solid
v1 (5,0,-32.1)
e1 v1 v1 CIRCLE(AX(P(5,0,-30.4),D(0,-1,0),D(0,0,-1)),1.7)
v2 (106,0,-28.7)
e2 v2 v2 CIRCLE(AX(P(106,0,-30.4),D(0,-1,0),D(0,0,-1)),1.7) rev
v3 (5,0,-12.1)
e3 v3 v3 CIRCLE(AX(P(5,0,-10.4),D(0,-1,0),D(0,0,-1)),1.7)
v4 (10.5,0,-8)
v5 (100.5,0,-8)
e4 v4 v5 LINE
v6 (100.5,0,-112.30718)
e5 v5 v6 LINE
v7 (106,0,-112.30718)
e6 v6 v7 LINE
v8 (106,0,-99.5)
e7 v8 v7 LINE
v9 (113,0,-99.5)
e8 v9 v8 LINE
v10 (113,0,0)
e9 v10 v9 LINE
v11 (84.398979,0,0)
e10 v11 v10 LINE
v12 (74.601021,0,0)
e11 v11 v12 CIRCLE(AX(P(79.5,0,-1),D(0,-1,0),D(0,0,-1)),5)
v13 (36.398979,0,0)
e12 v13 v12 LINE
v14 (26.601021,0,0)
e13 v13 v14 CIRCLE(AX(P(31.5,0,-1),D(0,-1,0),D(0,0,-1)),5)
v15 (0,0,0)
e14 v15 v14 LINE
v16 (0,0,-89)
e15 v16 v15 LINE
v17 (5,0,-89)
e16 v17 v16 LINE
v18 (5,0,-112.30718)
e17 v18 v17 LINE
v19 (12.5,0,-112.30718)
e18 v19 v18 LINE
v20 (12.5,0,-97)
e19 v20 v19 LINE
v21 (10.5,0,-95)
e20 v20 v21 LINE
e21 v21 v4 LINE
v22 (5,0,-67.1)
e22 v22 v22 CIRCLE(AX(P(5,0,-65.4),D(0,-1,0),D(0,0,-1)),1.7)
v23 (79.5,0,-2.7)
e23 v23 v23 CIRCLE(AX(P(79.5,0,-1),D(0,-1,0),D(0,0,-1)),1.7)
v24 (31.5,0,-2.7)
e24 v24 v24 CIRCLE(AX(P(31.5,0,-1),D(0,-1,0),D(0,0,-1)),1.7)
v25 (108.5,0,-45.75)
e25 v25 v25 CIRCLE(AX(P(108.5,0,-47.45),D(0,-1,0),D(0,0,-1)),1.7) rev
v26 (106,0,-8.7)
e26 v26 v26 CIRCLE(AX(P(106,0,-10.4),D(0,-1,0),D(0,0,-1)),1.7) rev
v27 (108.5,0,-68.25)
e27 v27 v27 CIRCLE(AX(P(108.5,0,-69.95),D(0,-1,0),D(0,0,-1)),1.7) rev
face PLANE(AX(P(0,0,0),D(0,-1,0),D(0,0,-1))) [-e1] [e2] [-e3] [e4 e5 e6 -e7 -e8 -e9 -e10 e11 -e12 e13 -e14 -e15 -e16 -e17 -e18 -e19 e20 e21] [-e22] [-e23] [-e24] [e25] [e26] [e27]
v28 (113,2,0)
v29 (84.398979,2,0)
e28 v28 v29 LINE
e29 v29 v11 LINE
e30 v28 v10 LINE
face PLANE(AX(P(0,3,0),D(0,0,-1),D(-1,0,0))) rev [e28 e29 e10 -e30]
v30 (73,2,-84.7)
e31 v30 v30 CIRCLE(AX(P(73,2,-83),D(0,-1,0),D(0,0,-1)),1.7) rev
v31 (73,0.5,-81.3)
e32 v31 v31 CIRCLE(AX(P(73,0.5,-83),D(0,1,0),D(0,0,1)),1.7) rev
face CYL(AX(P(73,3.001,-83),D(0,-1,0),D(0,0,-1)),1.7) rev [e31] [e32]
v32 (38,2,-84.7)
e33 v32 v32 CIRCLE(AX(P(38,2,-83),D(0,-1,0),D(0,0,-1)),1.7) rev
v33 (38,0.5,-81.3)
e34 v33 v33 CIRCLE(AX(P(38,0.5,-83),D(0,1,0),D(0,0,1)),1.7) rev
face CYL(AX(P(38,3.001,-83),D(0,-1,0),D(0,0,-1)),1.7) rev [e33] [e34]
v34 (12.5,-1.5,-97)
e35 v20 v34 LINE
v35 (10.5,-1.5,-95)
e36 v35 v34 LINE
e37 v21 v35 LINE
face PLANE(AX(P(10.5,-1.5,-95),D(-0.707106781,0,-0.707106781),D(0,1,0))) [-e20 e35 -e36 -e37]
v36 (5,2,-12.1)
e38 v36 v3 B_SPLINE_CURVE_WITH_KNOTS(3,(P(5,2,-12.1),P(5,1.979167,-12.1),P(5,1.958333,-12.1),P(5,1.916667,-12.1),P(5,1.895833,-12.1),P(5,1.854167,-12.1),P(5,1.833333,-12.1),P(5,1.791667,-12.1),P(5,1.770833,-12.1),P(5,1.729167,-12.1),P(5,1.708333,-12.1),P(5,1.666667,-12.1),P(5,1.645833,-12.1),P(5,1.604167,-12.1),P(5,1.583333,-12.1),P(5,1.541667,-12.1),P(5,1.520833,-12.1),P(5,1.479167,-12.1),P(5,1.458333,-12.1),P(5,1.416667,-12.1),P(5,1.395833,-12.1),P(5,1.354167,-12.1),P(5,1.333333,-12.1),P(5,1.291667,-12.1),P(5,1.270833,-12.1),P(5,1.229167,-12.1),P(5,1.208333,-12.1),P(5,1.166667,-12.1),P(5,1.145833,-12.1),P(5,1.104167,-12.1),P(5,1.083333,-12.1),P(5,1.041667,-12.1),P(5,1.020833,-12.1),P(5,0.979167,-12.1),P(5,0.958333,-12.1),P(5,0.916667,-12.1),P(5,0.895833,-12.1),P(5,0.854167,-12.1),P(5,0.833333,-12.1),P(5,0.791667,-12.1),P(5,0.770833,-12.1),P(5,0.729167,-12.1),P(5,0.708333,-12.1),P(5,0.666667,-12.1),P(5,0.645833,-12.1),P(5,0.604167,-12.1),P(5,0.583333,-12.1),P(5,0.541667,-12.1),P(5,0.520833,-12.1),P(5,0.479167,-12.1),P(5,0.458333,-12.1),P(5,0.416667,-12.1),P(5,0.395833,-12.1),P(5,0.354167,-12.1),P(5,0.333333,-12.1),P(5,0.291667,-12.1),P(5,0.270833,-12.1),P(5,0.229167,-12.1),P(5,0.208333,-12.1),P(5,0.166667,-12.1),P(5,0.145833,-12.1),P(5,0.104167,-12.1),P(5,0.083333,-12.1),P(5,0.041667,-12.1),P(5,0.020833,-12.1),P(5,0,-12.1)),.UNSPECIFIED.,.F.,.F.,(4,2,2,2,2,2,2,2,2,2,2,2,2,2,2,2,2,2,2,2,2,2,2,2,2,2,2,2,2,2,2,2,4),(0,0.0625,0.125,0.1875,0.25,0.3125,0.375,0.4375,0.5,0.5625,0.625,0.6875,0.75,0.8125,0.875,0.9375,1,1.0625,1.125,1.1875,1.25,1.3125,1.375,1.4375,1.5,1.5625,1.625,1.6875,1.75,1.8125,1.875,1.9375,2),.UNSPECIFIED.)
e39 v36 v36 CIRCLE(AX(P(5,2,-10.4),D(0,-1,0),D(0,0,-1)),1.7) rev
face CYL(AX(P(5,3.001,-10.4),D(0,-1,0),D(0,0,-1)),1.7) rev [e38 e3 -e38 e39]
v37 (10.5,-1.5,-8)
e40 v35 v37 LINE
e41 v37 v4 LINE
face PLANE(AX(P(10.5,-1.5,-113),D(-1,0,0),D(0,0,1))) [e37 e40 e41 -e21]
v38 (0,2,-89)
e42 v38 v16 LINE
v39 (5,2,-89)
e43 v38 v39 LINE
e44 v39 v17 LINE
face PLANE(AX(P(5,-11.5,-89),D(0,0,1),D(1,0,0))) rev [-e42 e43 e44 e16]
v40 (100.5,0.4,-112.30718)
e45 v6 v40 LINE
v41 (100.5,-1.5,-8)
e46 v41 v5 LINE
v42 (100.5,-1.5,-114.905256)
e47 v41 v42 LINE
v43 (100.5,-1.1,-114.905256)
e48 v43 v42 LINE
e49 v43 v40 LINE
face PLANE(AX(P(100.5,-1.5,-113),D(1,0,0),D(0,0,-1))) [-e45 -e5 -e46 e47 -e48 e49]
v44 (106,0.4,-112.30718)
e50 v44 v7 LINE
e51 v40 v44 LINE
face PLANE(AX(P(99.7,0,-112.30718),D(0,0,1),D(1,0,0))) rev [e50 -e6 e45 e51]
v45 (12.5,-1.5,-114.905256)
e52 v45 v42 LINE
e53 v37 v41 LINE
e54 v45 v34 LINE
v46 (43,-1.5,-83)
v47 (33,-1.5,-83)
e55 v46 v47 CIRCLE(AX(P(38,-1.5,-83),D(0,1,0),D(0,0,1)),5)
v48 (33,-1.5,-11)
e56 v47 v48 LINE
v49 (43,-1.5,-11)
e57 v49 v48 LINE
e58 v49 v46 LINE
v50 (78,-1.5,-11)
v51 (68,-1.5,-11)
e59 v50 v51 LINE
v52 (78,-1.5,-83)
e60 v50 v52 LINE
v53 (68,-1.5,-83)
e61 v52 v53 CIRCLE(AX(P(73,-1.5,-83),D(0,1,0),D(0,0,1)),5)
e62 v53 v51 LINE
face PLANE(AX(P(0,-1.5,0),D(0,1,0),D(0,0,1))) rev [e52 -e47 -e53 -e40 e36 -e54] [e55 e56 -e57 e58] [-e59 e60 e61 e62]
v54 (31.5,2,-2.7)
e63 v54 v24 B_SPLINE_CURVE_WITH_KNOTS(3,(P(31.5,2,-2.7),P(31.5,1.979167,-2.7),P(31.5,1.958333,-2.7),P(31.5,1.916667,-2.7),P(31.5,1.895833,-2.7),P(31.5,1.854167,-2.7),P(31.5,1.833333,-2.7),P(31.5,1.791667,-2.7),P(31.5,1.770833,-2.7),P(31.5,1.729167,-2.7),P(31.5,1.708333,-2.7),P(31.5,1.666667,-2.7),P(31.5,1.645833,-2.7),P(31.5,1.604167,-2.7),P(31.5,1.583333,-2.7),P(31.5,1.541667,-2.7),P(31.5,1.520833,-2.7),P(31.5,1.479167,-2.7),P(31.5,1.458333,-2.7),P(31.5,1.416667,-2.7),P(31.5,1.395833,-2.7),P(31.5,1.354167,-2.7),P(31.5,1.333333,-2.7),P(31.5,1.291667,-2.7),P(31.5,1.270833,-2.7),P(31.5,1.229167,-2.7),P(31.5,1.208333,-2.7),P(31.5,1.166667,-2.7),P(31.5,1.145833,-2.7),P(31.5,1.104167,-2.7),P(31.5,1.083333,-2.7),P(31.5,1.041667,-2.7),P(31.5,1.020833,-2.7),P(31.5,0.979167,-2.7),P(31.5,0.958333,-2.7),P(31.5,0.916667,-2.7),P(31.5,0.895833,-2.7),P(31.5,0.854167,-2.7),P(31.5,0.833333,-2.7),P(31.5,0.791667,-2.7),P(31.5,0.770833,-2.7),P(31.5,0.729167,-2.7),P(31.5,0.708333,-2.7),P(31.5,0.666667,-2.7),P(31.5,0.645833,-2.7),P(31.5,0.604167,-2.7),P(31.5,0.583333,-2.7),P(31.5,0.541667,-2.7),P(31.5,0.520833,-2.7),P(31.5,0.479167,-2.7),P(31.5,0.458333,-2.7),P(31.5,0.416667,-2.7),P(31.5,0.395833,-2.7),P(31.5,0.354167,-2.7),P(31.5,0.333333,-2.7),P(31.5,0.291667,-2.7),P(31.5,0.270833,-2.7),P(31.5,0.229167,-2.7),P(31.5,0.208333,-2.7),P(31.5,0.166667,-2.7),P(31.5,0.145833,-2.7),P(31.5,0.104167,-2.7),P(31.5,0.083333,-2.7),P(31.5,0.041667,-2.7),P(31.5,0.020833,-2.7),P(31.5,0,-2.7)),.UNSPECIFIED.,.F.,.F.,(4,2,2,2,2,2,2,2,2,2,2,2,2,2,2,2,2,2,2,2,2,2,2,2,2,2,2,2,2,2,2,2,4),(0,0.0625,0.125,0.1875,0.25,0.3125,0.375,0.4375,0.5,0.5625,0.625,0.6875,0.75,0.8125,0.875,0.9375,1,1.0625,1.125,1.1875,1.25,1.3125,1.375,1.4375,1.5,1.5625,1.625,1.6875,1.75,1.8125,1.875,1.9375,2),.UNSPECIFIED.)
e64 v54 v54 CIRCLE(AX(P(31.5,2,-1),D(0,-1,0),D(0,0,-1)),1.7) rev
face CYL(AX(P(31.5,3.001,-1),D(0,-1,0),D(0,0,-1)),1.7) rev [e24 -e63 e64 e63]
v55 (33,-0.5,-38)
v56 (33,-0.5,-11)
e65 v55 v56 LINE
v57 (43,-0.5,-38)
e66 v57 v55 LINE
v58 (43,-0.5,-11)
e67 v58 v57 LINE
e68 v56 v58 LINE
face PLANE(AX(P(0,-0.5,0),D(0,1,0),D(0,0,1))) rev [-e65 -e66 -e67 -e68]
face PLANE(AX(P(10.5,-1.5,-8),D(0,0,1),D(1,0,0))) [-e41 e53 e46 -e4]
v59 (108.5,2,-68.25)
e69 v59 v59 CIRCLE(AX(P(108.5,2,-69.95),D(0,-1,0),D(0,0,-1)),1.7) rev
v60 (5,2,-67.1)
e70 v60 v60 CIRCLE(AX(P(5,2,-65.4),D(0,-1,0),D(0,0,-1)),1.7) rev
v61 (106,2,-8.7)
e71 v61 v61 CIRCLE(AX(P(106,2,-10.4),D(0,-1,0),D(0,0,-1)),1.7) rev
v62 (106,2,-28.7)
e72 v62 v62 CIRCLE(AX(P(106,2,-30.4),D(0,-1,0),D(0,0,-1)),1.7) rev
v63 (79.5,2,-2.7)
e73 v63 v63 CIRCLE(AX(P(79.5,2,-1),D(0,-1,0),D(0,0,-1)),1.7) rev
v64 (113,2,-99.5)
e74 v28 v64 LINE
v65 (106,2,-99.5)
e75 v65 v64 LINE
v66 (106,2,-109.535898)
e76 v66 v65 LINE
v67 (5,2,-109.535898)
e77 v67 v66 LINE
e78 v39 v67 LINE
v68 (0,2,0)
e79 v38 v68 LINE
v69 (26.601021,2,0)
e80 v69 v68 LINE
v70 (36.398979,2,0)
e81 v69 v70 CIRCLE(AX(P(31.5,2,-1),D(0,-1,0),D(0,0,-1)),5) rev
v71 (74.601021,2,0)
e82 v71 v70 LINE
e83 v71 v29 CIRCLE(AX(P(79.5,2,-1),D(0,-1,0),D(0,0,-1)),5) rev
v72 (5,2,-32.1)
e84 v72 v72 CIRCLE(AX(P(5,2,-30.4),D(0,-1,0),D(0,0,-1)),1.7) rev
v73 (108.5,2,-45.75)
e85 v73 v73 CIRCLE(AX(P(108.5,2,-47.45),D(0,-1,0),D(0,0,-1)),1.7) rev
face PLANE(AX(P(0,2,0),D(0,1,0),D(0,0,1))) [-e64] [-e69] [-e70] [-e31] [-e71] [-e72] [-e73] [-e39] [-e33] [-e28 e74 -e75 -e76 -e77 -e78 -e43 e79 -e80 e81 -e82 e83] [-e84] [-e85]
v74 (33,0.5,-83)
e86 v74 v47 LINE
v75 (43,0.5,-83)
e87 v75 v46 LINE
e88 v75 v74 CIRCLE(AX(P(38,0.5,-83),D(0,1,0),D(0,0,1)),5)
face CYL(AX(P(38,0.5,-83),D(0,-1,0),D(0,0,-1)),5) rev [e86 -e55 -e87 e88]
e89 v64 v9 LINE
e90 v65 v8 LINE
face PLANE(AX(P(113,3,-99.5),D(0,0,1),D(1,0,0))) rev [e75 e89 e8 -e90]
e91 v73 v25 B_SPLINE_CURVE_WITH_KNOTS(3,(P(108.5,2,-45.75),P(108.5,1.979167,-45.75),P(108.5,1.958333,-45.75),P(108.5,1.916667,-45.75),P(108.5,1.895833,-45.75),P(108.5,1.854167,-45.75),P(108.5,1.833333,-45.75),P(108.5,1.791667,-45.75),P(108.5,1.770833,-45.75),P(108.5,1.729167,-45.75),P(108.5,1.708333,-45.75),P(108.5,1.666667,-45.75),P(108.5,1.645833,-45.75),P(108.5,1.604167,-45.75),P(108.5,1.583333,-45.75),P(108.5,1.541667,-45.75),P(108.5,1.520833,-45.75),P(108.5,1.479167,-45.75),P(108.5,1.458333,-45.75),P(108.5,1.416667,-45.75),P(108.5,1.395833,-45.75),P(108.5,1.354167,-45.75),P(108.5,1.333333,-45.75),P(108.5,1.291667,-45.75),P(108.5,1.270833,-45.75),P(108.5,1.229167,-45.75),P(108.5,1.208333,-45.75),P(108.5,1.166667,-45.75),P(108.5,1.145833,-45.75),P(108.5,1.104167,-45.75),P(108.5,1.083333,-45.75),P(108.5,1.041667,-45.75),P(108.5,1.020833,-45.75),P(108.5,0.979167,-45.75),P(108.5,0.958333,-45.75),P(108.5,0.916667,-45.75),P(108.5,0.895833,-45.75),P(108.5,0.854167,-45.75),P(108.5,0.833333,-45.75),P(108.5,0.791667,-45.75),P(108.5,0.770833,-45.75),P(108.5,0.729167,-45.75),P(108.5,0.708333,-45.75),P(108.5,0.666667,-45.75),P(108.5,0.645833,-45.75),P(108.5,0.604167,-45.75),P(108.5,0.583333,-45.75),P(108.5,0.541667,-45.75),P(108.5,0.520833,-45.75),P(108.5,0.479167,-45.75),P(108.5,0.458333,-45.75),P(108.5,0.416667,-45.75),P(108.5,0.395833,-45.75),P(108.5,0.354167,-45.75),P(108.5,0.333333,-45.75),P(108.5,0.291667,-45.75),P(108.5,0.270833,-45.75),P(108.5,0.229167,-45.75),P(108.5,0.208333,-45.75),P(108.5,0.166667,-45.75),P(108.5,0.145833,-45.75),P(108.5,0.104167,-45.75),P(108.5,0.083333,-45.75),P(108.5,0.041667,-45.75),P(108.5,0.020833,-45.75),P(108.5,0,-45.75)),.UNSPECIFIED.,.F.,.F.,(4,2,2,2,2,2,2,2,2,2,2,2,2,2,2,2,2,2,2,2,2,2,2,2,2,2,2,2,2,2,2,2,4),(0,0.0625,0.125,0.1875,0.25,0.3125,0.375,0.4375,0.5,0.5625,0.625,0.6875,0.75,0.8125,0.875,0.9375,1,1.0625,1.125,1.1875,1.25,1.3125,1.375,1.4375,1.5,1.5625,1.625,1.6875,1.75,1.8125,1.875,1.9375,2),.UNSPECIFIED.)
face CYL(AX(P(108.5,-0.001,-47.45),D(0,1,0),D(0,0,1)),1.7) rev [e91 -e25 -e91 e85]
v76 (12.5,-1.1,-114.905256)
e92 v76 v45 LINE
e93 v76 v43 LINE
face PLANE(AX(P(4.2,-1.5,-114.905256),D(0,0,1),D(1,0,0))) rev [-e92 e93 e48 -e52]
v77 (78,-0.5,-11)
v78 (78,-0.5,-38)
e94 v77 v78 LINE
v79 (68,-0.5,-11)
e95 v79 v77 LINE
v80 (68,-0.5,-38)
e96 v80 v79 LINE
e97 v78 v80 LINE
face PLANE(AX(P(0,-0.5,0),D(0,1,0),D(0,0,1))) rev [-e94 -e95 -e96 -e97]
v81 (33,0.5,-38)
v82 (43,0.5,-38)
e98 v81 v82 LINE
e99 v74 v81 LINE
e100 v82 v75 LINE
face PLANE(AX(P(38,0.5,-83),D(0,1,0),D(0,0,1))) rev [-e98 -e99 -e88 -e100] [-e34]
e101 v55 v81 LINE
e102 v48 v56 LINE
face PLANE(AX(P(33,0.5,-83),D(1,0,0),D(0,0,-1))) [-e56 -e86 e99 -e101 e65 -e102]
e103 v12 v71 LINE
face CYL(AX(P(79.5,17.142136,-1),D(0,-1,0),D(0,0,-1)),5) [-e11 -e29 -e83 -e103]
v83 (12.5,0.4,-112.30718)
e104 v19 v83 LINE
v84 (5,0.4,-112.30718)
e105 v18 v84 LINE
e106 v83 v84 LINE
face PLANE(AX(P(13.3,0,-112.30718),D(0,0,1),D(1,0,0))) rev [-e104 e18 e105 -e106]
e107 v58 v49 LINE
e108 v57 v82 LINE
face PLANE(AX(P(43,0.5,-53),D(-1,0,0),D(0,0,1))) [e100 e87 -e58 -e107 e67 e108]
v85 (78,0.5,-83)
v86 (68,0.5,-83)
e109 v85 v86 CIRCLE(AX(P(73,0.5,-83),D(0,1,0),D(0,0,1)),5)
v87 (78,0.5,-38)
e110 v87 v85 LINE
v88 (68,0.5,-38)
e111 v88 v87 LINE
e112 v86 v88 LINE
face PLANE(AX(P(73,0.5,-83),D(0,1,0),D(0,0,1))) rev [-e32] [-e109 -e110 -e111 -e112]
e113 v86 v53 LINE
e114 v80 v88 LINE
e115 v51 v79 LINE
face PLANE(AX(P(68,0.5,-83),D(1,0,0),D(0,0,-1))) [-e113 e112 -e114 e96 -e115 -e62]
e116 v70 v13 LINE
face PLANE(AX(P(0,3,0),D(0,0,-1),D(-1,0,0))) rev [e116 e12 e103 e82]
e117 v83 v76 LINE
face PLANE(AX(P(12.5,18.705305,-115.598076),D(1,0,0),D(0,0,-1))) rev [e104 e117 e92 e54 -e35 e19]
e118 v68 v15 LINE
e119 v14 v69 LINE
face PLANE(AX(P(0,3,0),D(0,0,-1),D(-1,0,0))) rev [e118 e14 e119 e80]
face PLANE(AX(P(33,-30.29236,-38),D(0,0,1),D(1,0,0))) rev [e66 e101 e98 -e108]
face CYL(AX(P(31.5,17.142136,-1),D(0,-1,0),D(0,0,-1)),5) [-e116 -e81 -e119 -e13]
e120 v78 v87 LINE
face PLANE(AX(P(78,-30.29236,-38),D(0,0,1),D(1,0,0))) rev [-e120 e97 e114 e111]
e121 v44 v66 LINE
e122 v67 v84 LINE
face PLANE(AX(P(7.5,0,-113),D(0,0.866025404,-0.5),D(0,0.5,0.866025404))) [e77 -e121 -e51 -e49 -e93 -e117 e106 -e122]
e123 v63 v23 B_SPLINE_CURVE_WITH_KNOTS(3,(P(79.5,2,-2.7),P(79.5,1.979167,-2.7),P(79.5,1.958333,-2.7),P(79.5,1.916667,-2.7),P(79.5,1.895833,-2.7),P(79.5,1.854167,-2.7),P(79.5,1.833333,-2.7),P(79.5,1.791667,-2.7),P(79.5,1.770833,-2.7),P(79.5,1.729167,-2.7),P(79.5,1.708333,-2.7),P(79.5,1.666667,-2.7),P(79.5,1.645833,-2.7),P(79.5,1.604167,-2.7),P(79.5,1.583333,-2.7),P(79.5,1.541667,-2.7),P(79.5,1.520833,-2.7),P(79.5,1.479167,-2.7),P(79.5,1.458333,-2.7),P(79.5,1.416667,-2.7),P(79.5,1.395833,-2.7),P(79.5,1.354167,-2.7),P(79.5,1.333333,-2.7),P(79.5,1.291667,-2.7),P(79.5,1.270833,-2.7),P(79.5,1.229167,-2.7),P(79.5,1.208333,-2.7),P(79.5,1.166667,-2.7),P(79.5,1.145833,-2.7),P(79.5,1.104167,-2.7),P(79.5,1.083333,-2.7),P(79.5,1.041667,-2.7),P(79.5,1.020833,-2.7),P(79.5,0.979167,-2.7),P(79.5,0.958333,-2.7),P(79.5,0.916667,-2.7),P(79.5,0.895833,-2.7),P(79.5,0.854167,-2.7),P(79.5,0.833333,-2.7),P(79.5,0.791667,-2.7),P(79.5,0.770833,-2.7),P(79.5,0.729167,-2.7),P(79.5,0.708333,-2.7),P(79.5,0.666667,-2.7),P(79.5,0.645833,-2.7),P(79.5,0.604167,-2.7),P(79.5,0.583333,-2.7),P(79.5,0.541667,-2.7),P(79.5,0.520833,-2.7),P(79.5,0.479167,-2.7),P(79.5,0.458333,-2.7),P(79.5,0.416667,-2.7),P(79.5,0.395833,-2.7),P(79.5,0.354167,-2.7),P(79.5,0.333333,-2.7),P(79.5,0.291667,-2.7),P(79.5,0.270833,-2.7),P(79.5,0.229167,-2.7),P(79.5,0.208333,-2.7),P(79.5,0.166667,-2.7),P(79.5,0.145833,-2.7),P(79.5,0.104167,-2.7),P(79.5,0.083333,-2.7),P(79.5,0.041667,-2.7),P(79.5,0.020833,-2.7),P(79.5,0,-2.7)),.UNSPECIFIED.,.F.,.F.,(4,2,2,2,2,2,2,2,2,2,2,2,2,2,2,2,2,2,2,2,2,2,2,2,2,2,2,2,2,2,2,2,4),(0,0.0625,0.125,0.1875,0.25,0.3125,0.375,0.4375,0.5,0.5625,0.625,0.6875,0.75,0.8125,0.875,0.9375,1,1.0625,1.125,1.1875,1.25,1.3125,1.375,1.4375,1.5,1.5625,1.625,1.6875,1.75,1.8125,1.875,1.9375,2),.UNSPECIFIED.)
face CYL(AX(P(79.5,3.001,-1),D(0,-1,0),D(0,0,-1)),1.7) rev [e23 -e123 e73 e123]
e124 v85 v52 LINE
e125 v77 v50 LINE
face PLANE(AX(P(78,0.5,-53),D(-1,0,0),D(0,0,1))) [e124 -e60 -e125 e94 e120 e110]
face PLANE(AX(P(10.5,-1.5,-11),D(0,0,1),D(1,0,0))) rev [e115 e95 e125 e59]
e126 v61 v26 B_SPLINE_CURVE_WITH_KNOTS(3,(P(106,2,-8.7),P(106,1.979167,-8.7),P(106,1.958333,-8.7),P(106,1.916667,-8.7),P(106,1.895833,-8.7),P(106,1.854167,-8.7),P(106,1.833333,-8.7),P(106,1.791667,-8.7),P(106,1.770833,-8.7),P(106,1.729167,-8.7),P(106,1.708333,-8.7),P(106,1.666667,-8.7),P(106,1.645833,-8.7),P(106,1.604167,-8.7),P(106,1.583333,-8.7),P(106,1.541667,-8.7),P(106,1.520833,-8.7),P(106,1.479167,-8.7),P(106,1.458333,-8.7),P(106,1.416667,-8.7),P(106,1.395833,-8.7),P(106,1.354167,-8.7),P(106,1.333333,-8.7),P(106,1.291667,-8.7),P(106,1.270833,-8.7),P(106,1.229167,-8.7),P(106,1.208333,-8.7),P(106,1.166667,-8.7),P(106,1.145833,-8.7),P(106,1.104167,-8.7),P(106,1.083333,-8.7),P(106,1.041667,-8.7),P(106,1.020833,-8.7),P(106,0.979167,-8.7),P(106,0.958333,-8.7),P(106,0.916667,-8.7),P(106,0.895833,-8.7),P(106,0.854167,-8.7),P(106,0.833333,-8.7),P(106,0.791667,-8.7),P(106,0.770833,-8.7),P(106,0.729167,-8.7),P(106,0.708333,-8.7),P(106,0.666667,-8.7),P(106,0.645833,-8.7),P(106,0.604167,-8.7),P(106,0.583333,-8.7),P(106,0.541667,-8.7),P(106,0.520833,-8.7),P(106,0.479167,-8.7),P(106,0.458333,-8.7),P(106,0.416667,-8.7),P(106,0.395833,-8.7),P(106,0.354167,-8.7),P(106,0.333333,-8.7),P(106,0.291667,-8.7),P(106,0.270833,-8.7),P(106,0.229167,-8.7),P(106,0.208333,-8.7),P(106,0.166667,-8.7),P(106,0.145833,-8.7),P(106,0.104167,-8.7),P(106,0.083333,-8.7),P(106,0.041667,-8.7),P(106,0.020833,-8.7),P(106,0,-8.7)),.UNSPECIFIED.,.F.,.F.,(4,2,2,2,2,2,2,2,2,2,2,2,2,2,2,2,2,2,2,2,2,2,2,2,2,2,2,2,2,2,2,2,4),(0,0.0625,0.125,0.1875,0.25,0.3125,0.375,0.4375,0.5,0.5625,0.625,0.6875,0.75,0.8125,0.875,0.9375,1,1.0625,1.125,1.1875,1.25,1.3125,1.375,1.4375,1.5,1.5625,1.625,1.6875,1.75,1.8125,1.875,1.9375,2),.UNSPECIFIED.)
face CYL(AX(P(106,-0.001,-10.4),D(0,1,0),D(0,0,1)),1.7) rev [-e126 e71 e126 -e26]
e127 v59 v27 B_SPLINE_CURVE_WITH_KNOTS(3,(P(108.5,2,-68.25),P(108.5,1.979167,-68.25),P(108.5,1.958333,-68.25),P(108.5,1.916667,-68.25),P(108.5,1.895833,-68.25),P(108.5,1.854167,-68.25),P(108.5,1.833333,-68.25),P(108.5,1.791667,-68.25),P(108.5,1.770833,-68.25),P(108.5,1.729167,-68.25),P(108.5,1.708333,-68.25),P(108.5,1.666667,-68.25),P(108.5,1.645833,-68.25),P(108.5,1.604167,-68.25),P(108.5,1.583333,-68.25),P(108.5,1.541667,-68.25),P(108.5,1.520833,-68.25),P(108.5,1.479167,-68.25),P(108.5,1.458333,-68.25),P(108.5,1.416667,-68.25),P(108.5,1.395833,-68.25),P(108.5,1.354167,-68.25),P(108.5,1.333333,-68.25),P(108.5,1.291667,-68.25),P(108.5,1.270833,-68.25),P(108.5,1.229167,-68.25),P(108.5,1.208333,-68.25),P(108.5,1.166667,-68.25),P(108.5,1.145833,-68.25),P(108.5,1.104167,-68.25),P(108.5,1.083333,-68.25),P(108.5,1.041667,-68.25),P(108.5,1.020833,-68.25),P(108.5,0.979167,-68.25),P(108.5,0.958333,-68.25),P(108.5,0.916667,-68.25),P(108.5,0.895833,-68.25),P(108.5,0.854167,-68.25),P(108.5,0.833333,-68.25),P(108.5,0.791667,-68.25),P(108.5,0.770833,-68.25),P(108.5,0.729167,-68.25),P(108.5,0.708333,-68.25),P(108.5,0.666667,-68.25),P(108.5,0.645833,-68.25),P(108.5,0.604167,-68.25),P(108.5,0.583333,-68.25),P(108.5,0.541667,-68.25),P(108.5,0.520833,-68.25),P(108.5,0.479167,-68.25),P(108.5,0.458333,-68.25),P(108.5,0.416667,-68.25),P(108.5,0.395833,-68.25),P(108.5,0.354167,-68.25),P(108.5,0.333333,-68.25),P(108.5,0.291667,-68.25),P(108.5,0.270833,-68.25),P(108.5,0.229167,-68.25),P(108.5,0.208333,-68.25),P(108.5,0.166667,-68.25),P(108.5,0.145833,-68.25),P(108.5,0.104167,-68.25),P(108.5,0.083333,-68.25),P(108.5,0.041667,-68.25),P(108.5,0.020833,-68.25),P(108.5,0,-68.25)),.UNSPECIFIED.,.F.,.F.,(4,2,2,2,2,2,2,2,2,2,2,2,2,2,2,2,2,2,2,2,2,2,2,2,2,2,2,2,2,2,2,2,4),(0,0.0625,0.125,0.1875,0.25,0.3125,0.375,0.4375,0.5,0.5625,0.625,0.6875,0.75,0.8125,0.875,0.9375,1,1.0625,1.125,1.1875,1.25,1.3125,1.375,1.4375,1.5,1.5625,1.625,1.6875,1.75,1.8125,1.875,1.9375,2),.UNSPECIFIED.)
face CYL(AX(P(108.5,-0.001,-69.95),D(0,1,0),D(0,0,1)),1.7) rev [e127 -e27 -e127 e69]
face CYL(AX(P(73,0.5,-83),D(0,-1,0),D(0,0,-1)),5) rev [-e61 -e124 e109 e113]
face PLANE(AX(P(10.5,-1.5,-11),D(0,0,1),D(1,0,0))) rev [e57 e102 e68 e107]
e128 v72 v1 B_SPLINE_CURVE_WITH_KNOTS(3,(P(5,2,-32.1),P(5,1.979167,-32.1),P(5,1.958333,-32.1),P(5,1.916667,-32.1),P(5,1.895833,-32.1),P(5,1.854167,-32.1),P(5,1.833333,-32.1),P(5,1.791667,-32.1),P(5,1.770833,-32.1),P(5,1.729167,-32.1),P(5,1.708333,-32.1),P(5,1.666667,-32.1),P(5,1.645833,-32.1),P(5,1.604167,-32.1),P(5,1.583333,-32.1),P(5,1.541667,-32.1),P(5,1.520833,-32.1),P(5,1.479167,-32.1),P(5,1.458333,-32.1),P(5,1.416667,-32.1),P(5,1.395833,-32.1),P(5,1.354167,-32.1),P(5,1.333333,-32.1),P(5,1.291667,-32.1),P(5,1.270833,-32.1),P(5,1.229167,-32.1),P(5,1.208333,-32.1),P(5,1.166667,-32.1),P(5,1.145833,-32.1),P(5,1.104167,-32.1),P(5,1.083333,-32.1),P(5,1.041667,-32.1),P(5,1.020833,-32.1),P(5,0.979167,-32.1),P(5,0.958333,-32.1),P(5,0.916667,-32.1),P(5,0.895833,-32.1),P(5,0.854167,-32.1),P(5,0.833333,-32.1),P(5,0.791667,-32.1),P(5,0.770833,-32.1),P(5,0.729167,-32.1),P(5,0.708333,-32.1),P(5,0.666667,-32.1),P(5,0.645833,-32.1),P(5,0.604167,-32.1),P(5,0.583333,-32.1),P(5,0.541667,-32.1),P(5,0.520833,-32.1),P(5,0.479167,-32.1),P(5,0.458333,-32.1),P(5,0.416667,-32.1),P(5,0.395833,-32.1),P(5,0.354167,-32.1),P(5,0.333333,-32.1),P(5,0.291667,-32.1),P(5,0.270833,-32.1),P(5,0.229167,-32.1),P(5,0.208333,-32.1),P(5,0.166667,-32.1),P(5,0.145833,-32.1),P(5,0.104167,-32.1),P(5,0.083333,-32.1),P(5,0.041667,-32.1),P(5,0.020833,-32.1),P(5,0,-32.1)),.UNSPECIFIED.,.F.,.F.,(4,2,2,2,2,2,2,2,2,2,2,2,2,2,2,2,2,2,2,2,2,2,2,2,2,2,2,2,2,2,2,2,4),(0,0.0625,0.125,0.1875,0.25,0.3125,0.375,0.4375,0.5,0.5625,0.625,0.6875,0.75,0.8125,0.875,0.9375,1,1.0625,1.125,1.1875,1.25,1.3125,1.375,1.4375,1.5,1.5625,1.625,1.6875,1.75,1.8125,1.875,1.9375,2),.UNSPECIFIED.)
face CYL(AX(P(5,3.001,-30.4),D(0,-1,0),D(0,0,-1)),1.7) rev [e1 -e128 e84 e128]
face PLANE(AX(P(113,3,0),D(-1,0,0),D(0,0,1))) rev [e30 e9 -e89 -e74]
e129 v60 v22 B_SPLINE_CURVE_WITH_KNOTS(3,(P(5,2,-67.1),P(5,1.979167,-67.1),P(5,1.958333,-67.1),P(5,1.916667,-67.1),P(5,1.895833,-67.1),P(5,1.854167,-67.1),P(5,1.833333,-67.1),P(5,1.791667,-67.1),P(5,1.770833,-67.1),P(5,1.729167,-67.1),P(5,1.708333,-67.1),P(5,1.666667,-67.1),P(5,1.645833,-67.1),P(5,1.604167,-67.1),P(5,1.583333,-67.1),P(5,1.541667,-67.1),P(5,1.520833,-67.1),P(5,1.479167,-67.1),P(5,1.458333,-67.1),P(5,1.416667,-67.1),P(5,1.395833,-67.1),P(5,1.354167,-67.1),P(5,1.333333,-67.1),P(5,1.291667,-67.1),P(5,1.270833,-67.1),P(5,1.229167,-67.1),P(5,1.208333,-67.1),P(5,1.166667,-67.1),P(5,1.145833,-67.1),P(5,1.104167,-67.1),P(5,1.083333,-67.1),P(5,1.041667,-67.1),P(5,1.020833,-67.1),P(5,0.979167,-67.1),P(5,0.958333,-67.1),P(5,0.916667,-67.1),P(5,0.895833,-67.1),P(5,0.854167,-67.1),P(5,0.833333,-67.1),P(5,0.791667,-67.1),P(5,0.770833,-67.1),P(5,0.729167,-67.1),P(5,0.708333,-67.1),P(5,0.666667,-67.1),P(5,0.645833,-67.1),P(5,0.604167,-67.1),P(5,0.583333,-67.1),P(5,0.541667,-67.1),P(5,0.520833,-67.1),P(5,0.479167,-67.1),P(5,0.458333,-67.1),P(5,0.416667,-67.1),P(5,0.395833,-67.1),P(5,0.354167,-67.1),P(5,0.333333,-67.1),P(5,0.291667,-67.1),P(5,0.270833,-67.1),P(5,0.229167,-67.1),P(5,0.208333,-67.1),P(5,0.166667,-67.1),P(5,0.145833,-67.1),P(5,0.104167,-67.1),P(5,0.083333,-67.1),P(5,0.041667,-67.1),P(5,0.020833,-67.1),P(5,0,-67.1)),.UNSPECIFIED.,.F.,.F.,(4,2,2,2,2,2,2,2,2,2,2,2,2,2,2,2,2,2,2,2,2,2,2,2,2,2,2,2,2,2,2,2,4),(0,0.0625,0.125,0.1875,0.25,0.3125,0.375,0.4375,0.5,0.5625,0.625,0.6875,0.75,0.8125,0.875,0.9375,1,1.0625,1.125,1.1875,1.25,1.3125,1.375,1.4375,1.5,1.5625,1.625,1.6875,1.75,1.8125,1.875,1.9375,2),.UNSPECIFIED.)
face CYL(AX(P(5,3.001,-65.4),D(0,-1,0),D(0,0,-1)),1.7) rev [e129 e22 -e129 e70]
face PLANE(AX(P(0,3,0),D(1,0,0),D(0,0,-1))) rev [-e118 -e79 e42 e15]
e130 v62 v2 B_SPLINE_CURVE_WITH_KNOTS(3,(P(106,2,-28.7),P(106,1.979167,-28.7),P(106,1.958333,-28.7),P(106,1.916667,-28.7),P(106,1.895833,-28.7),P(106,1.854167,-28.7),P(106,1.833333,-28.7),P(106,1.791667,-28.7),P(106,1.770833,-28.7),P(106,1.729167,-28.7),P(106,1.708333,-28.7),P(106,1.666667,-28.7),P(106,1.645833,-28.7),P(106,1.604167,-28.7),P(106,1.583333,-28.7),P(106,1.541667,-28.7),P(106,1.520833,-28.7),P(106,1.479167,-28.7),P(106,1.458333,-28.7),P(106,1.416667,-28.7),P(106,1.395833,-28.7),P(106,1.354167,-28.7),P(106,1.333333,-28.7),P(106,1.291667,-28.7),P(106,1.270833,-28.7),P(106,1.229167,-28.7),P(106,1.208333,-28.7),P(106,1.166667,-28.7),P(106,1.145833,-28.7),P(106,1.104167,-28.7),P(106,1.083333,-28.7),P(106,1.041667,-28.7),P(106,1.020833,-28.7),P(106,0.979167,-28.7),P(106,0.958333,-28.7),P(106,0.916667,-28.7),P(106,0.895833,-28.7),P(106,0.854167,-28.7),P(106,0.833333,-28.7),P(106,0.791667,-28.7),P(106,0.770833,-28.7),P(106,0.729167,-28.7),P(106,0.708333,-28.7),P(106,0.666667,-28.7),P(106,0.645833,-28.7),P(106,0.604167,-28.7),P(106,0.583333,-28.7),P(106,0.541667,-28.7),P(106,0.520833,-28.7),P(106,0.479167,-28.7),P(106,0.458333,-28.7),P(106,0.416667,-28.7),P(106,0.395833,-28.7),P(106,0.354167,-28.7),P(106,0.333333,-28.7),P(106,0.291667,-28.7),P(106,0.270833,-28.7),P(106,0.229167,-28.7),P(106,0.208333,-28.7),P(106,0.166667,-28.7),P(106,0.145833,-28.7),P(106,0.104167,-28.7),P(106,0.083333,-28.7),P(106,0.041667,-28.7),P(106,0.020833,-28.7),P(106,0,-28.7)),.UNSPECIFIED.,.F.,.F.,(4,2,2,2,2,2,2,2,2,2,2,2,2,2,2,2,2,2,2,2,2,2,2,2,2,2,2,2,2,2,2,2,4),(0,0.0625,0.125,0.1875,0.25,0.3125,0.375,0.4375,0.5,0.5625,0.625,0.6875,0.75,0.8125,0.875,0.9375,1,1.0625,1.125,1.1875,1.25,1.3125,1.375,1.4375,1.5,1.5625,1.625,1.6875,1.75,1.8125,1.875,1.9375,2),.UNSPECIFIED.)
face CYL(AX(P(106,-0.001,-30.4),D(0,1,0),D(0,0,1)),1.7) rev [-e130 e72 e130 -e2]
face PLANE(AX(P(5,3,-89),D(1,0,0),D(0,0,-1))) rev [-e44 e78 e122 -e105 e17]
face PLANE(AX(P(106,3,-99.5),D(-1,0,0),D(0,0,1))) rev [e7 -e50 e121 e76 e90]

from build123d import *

# Parameters (mm, degrees)
SKETCH_1_W           = 113
SKETCH_1_H           = 113
EXTRUDE_1_DEPTH      = 3
CUT_EXTRUDE_1_REACH  = 161.834
SKETCH_2_R           = 1.7
SKETCH_3_W           = 90
SKETCH_3_H           = 105
EXTRUDE_2_DEPTH      = 1.5
SKETCH_5_R           = 5
EXTRUDE_3_DEPTH      = 3
CUT_EXTRUDE_2_REACH  = 161.834
SKETCH_6_R           = 1.7
CUT_EXTRUDE_3_REACH  = 161.834
SKETCH_7_R           = 1.7
CUT_EXTRUDE_4_REACH  = 161.869
SKETCH_8_R           = 1.7
EXTRUDE_5_DEPTH      = 90
CUT_EXTRUDE_5_DEPTH  = 2
SKETCH_13_W          = 2
SKETCH_13_H          = 12
EXTRUDE_6_DEPTH      = 11.5
CUT_EXTRUDE_6_REACH  = 161.985
SKETCH_14_R          = 1.7
CUT_EXTRUDE_7_REACH  = 164.062
EXTRUDE_7_DEPTH      = 8.5
SKETCH_17_W          = 2
SKETCH_17_H          = 11.5
EXTRUDE_8_DEPTH      = 3
FILLET_1_R           = 1
CUT_EXTRUDE_8_DEPTH  = 163.062226394
SKETCH_20_W          = 113
SKETCH_20_H          = 12.124355653
CUT_EXTRUDE_9_DEPTH  = 1
CHAMFER_1_SIZE       = 1
SKETCH_21_W          = 7
SKETCH_21_H          = 13.5
CUT_EXTRUDE_10_DEPTH = 163.062226394
SKETCH_22_W          = 5
SKETCH_22_H          = 24
CUT_EXTRUDE_11_DEPTH = 163.062226394
SKETCH_23_W          = 2
SKETCH_23_H          = 18.598076211
CUT_EXTRUDE_12_DEPTH = 1.5
CHAMFER_2_SIZE       = 2
SKETCH_24_W          = 0.692820323
SKETCH_24_H          = 0.4
CUT_EXTRUDE_13_DEPTH = 95.5
SKETCH_25_W          = 0.692820323
SKETCH_25_H          = 0.4
CUT_EXTRUDE_14_DEPTH = 5.5
SKETCH_26_W          = 0.692820323
SKETCH_26_H          = 0.4
CUT_EXTRUDE_15_DEPTH = 7.5
SKETCH_27_W          = 113
SKETCH_27_H          = 105.875644347
CUT_EXTRUDE_16_DEPTH = 162.723430061
SKETCH_29_W          = 10
SKETCH_29_H          = 5
CUT_EXTRUDE_17_DEPTH = 162.605129345
SKETCH_30_W          = 10
SKETCH_30_H          = 2
CUT_EXTRUDE_18_DEPTH = 37
SKETCH_31_W          = 10
SKETCH_31_H          = 27
EXTRUDE_9_DEPTH      = 1
CUT_EXTRUDE_19_REACH = 163.569
SKETCH_32_W          = 5
SKETCH_32_H          = 12


with BuildPart() as part:
    # 草图1 → 凸台-拉伸1 (new body)
    with BuildSketch(Plane(origin=(0, 0, 0), x_dir=(1, 0, 0), z_dir=(0, 1, 0))):
        with Locations((56.5, 56.5)):
            Rectangle(SKETCH_1_W, SKETCH_1_H)
    extrude(amount=EXTRUDE_1_DEPTH)

    # 草图2 → 切除-拉伸1 (cut, up to next)
    with BuildSketch(Plane(origin=(0, 3, 0), x_dir=(1, 0, 0), z_dir=(0, 1, 0)), mode=Mode.PRIVATE) as cut_extrude_1_sk1:
        with Locations(Location((108.5, 69.95, 0), (0, 0, 270))):
            Circle(SKETCH_2_R)
    cut_extrude_1_tool1 = extrude(cut_extrude_1_sk1.sketch, amount=-CUT_EXTRUDE_1_REACH, mode=Mode.PRIVATE) & part.part
    # 草图2 → 切除-拉伸1 (cut, up to next)
    with BuildSketch(Plane(origin=(0, 3, 0), x_dir=(1, 0, 0), z_dir=(0, 1, 0)), mode=Mode.PRIVATE) as cut_extrude_1_sk2:
        with Locations(Location((108.5, 47.45, 0), (0, 0, 270))):
            Circle(SKETCH_2_R)
    cut_extrude_1_tool2 = extrude(cut_extrude_1_sk2.sketch, amount=-CUT_EXTRUDE_1_REACH, mode=Mode.PRIVATE) & part.part
    # 草图2 → 切除-拉伸1 (cut, up to next)
    with BuildSketch(Plane(origin=(0, 3, 0), x_dir=(1, 0, 0), z_dir=(0, 1, 0)), mode=Mode.PRIVATE) as cut_extrude_1_sk3:
        with Locations(Location((106, 30.4, 0), (0, 0, 270))):
            Circle(SKETCH_2_R)
    cut_extrude_1_tool3 = extrude(cut_extrude_1_sk3.sketch, amount=-CUT_EXTRUDE_1_REACH, mode=Mode.PRIVATE) & part.part
    # 草图2 → 切除-拉伸1 (cut, up to next)
    with BuildSketch(Plane(origin=(0, 3, 0), x_dir=(1, 0, 0), z_dir=(0, 1, 0)), mode=Mode.PRIVATE) as cut_extrude_1_sk4:
        with Locations(Location((106, 10.4, 0), (0, 0, 270))):
            Circle(SKETCH_2_R)
    cut_extrude_1_tool4 = extrude(cut_extrude_1_sk4.sketch, amount=-CUT_EXTRUDE_1_REACH, mode=Mode.PRIVATE) & part.part
    add(cut_extrude_1_tool1.solids().sort_by_distance((108.5, 3, -69.95))[0], mode=Mode.SUBTRACT)
    add(cut_extrude_1_tool2.solids().sort_by_distance((108.5, 3, -47.45))[0], mode=Mode.SUBTRACT)
    add(cut_extrude_1_tool3.solids().sort_by_distance((106, 3, -30.4))[0], mode=Mode.SUBTRACT)
    add(cut_extrude_1_tool4.solids().sort_by_distance((106, 3, -10.4))[0], mode=Mode.SUBTRACT)

    # 草图3 → 凸台-拉伸2 (add)
    with BuildSketch(Plane(origin=(0, 0, 0), x_dir=(1, 0, 0), z_dir=(0, 1, 0))):
        with Locations((55.5, 60.5)):
            Rectangle(SKETCH_3_W, SKETCH_3_H)
    extrude(amount=-EXTRUDE_2_DEPTH)

    # 草图5 → 凸台-拉伸3 (add)
    with BuildSketch(Plane.XZ):
        with Locations((79.5, -1)):
            Circle(SKETCH_5_R)
        with Locations((31.5, -1)):
            Circle(SKETCH_5_R)
    extrude(amount=-EXTRUDE_3_DEPTH)

    # 草图6 → 切除-拉伸2 (cut, up to next)
    with BuildSketch(Plane.XZ, mode=Mode.PRIVATE) as cut_extrude_2_sk1:
        with Locations(Location((31.5, -1, 0), (0, 0, 270))):
            Circle(SKETCH_6_R)
    cut_extrude_2_tool1 = extrude(cut_extrude_2_sk1.sketch, amount=-CUT_EXTRUDE_2_REACH, mode=Mode.PRIVATE) & part.part
    # 草图6 → 切除-拉伸2 (cut, up to next)
    with BuildSketch(Plane.XZ, mode=Mode.PRIVATE) as cut_extrude_2_sk2:
        with Locations(Location((79.5, -1, 0), (0, 0, 270))):
            Circle(SKETCH_6_R)
    cut_extrude_2_tool2 = extrude(cut_extrude_2_sk2.sketch, amount=-CUT_EXTRUDE_2_REACH, mode=Mode.PRIVATE) & part.part
    add(cut_extrude_2_tool1.solids().sort_by_distance((31.5, 0, -1))[0], mode=Mode.SUBTRACT)
    add(cut_extrude_2_tool2.solids().sort_by_distance((79.5, 0, -1))[0], mode=Mode.SUBTRACT)

    # 草图7 → 切除-拉伸3 (cut, up to next)
    with BuildSketch(Plane.XZ, mode=Mode.PRIVATE) as cut_extrude_3_sk1:
        with Locations(Location((5, -10.4, 0), (0, 0, 270))):
            Circle(SKETCH_7_R)
    cut_extrude_3_tool1 = extrude(cut_extrude_3_sk1.sketch, amount=-CUT_EXTRUDE_3_REACH, mode=Mode.PRIVATE) & part.part
    # 草图7 → 切除-拉伸3 (cut, up to next)
    with BuildSketch(Plane.XZ, mode=Mode.PRIVATE) as cut_extrude_3_sk2:
        with Locations(Location((5, -30.4, 0), (0, 0, 270))):
            Circle(SKETCH_7_R)
    cut_extrude_3_tool2 = extrude(cut_extrude_3_sk2.sketch, amount=-CUT_EXTRUDE_3_REACH, mode=Mode.PRIVATE) & part.part
    # 草图7 → 切除-拉伸3 (cut, up to next)
    with BuildSketch(Plane.XZ, mode=Mode.PRIVATE) as cut_extrude_3_sk3:
        with Locations(Location((5, -65.4, 0), (0, 0, 270))):
            Circle(SKETCH_7_R)
    cut_extrude_3_tool3 = extrude(cut_extrude_3_sk3.sketch, amount=-CUT_EXTRUDE_3_REACH, mode=Mode.PRIVATE) & part.part
    add(cut_extrude_3_tool1.solids().sort_by_distance((5, 0, -10.4))[0], mode=Mode.SUBTRACT)
    add(cut_extrude_3_tool2.solids().sort_by_distance((5, 0, -30.4))[0], mode=Mode.SUBTRACT)
    add(cut_extrude_3_tool3.solids().sort_by_distance((5, 0, -65.4))[0], mode=Mode.SUBTRACT)

    # 草图8 → 切除-拉伸4 (cut, up to next)
    with BuildSketch(Plane.XZ.offset(1.5), mode=Mode.PRIVATE) as cut_extrude_4_sk1:
        with Locations(Location((38, -83, 0), (0, 0, 270))):
            Circle(SKETCH_8_R)
    cut_extrude_4_tool1 = extrude(cut_extrude_4_sk1.sketch, amount=-CUT_EXTRUDE_4_REACH, mode=Mode.PRIVATE) & part.part
    # 草图8 → 切除-拉伸4 (cut, up to next)
    with BuildSketch(Plane.XZ.offset(1.5), mode=Mode.PRIVATE) as cut_extrude_4_sk2:
        with Locations(Location((73, -83, 0), (0, 0, 270))):
            Circle(SKETCH_8_R)
    cut_extrude_4_tool2 = extrude(cut_extrude_4_sk2.sketch, amount=-CUT_EXTRUDE_4_REACH, mode=Mode.PRIVATE) & part.part
    add(cut_extrude_4_tool1.solids().sort_by_distance((38, -1.5, -83))[0], mode=Mode.SUBTRACT)
    add(cut_extrude_4_tool2.solids().sort_by_distance((73, -1.5, -83))[0], mode=Mode.SUBTRACT)

    # 草图10 → 凸台-拉伸5 (add)
    with BuildSketch(Plane(origin=(100.5, 0, 0), x_dir=(0, 0, -1), z_dir=(1, 0, 0))):
        Polygon((113, 0), (115.598076211, -1.5), (113, -1.5), align=None)
    extrude(amount=-EXTRUDE_5_DEPTH)

    # 草图11 → 切除-拉伸5 (cut)
    with BuildSketch(Plane(origin=(0, -1.5, 0), x_dir=(1, 0, 0), z_dir=(0, 1, 0))):
        with BuildLine():
            Line((33, 83), (33, 53))
            ThreePointArc((33, 53), (38, 48), (43, 53))
            Line((43, 53), (43, 83))
            ThreePointArc((43, 83), (38, 88), (33, 83))
        make_face()
        with BuildLine():
            Line((68, 83), (68, 53))
            ThreePointArc((68, 53), (73, 48), (78, 53))
            Line((78, 53), (78, 83))
            ThreePointArc((78, 83), (73, 88), (68, 83))
        make_face()
    extrude(amount=CUT_EXTRUDE_5_DEPTH, mode=Mode.SUBTRACT)

    # 草图13 → 凸台-拉伸6 (add)
    with BuildSketch(Plane.XZ):
        with Locations((4, -83)):
            Rectangle(SKETCH_13_W, SKETCH_13_H)
    extrude(amount=EXTRUDE_6_DEPTH)

    # 草图14 → 切除-拉伸6 (cut, up to next)
    with BuildSketch(Plane.ZY.offset(-3), mode=Mode.PRIVATE) as cut_extrude_6_sk1:
        with Locations((-83.5, -5)):
            Circle(SKETCH_14_R)
    cut_extrude_6_tool1 = extrude(cut_extrude_6_sk1.sketch, amount=-CUT_EXTRUDE_6_REACH, mode=Mode.PRIVATE) & part.part
    add(cut_extrude_6_tool1.solids().sort_by_distance((3, -5, -83.5))[0], mode=Mode.SUBTRACT)

    # 草图15 → 切除-拉伸7 (cut, up to next)
    with BuildSketch(Plane.XZ, mode=Mode.PRIVATE) as cut_extrude_7_sk1:
        Polygon((113, -100.875644347), (106, -113), (113, -113), align=None)
    cut_extrude_7_tool1 = extrude(cut_extrude_7_sk1.sketch, amount=-CUT_EXTRUDE_7_REACH, mode=Mode.PRIVATE) & part.part
    add(cut_extrude_7_tool1.solids().sort_by_distance((110.666667, 0, -108.958548))[0], mode=Mode.SUBTRACT)

    # 草图16 → 凸台-拉伸7 (add)
    with BuildSketch(Plane.XZ):
        Polygon((113, -99.5), (107.5, -99.5), (107.5, -110.401923789), (113, -100.875644347), align=None)
    extrude(amount=EXTRUDE_7_DEPTH)

    # 草图17 → 凸台-拉伸8 (add)
    with BuildSketch(Plane.ZY.offset(-3)):
        with Locations((-78, -5.75)):
            Rectangle(SKETCH_17_W, SKETCH_17_H)
    extrude(amount=EXTRUDE_8_DEPTH)

    # 圆角1
    fillet_1_edges = [part.edges().sort_by_distance(p)[0] for p in [
        (3, -5.75, -79),
    ]]
    fillet(fillet_1_edges, radius=FILLET_1_R)

    # 草图19 → 切除-拉伸8 (cut, through all)
    with BuildSketch(Plane.ZY):
        Polygon((-113, 0), (-107.803847577, 3), (-113, 3), align=None)
    extrude(amount=-CUT_EXTRUDE_8_DEPTH, mode=Mode.SUBTRACT)

    # 草图20 → 切除-拉伸9 (cut)
    with BuildSketch(Plane(origin=(0, 3, 0), x_dir=(1, 0, 0), z_dir=(0, 1, 0))):
        with Locations((56.5, 106.937822173)):
            Rectangle(SKETCH_20_W, SKETCH_20_H)
    extrude(amount=-CUT_EXTRUDE_9_DEPTH, mode=Mode.SUBTRACT)

    # 倒角1
    chamfer_1_edges = [part.edges().sort_by_distance(p)[0] for p in [
        (56.5, 2, -100.875644347),
    ]]
    chamfer(chamfer_1_edges, length=CHAMFER_1_SIZE - 0.0001)  # a hair under: the kernel refuses the full size

    # 草图21 → 切除-拉伸10 (cut, through all)
    with BuildSketch(Plane.XZ.offset(8.5)):
        with Locations((109.5, -106.25)):
            Rectangle(SKETCH_21_W, SKETCH_21_H)
    extrude(amount=-CUT_EXTRUDE_10_DEPTH, mode=Mode.SUBTRACT)

    # 草图22 → 切除-拉伸11 (cut, through all)
    with BuildSketch(Plane.XZ):
        with Locations((2.5, -101)):
            Rectangle(SKETCH_22_W, SKETCH_22_H)
    extrude(amount=-CUT_EXTRUDE_11_DEPTH, mode=Mode.SUBTRACT)

    # 草图23 → 切除-拉伸12 (cut)
    with BuildSketch(Plane.XZ.offset(1.5)):
        with Locations((11.5, -106.299038106)):
            Rectangle(SKETCH_23_W, SKETCH_23_H)
    extrude(amount=-CUT_EXTRUDE_12_DEPTH, mode=Mode.SUBTRACT)

    # 倒角2
    chamfer_2_edges = [part.edges().sort_by_distance(p)[0] for p in [
        (10.5, -0.75, -97),
    ]]
    chamfer(chamfer_2_edges, length=CHAMFER_2_SIZE - 0.0001)  # a hair under: the kernel refuses the full size

    # 草图24 → 切除-拉伸13 (cut)
    with BuildSketch(Plane(origin=(100.5, 0, 0), x_dir=(0, 0, -1), z_dir=(1, 0, 0))):
        with Locations((115.25166605, -1.3)):
            Rectangle(SKETCH_24_W, SKETCH_24_H)
    extrude(amount=-CUT_EXTRUDE_13_DEPTH, mode=Mode.SUBTRACT)

    # 草图25 → 切除-拉伸14 (cut)
    with BuildSketch(Plane(origin=(106, 0, 0), x_dir=(0, 0, -1), z_dir=(1, 0, 0))):
        with Locations((112.653589839, 0.2)):
            Rectangle(SKETCH_25_W, SKETCH_25_H)
    extrude(amount=-CUT_EXTRUDE_14_DEPTH, mode=Mode.SUBTRACT)

    # 草图26 → 切除-拉伸15 (cut)
    with BuildSketch(Plane.ZY.offset(-5)):
        with Locations((-112.653589839, 0.2)):
            Rectangle(SKETCH_26_W, SKETCH_26_H)
    extrude(amount=-CUT_EXTRUDE_15_DEPTH, mode=Mode.SUBTRACT)

    # 草图27 → 切除-拉伸16 (cut, through all)
    with BuildSketch(Plane(origin=(0, 2, 0), x_dir=(1, 0, 0), z_dir=(0, 1, 0))):
        with Locations((56.5, 48.937822174)):
            Rectangle(SKETCH_27_W, SKETCH_27_H)
    extrude(amount=CUT_EXTRUDE_16_DEPTH, mode=Mode.SUBTRACT)

    # 草图29 → 切除-拉伸17 (cut, through all)
    with BuildSketch(Plane.XZ.offset(-0.5)):
        with Locations((38, -50.5)):
            Rectangle(SKETCH_29_W, SKETCH_29_H)
        with Locations((73, -50.5)):
            Rectangle(SKETCH_29_W, SKETCH_29_H)
    extrude(amount=CUT_EXTRUDE_17_DEPTH, mode=Mode.SUBTRACT)

    # 草图30 → 切除-拉伸18 (cut)
    with BuildSketch(Plane(origin=(0, 0, -48), x_dir=(-1, 0, 0), z_dir=(0, 0, -1))):
        with Locations((-38, -0.5)):
            Rectangle(SKETCH_30_W, SKETCH_30_H)
        with Locations((-73, -0.5)):
            Rectangle(SKETCH_30_W, SKETCH_30_H)
    extrude(amount=-CUT_EXTRUDE_18_DEPTH, mode=Mode.SUBTRACT)

    # 草图31 → 凸台-拉伸9 (add)
    with BuildSketch(Plane.XZ.offset(-0.5)):
        with Locations((38, -24.5)):
            Rectangle(SKETCH_31_W, SKETCH_31_H)
        with Locations((73, -24.5)):
            Rectangle(SKETCH_31_W, SKETCH_31_H)
    extrude(amount=EXTRUDE_9_DEPTH)

    # 草图32 → 切除-拉伸19 (cut, up to next)
    with BuildSketch(Plane.XZ, mode=Mode.PRIVATE) as cut_extrude_19_sk1:
        with Locations((2.5, -83)):
            Rectangle(SKETCH_32_W, SKETCH_32_H)
    cut_extrude_19_tool1 = extrude(cut_extrude_19_sk1.sketch, amount=CUT_EXTRUDE_19_REACH, mode=Mode.PRIVATE) & part.part
    add(cut_extrude_19_tool1.solids().sort_by_distance((2.5, 0, -83))[0], mode=Mode.SUBTRACT)


solid = part.part
